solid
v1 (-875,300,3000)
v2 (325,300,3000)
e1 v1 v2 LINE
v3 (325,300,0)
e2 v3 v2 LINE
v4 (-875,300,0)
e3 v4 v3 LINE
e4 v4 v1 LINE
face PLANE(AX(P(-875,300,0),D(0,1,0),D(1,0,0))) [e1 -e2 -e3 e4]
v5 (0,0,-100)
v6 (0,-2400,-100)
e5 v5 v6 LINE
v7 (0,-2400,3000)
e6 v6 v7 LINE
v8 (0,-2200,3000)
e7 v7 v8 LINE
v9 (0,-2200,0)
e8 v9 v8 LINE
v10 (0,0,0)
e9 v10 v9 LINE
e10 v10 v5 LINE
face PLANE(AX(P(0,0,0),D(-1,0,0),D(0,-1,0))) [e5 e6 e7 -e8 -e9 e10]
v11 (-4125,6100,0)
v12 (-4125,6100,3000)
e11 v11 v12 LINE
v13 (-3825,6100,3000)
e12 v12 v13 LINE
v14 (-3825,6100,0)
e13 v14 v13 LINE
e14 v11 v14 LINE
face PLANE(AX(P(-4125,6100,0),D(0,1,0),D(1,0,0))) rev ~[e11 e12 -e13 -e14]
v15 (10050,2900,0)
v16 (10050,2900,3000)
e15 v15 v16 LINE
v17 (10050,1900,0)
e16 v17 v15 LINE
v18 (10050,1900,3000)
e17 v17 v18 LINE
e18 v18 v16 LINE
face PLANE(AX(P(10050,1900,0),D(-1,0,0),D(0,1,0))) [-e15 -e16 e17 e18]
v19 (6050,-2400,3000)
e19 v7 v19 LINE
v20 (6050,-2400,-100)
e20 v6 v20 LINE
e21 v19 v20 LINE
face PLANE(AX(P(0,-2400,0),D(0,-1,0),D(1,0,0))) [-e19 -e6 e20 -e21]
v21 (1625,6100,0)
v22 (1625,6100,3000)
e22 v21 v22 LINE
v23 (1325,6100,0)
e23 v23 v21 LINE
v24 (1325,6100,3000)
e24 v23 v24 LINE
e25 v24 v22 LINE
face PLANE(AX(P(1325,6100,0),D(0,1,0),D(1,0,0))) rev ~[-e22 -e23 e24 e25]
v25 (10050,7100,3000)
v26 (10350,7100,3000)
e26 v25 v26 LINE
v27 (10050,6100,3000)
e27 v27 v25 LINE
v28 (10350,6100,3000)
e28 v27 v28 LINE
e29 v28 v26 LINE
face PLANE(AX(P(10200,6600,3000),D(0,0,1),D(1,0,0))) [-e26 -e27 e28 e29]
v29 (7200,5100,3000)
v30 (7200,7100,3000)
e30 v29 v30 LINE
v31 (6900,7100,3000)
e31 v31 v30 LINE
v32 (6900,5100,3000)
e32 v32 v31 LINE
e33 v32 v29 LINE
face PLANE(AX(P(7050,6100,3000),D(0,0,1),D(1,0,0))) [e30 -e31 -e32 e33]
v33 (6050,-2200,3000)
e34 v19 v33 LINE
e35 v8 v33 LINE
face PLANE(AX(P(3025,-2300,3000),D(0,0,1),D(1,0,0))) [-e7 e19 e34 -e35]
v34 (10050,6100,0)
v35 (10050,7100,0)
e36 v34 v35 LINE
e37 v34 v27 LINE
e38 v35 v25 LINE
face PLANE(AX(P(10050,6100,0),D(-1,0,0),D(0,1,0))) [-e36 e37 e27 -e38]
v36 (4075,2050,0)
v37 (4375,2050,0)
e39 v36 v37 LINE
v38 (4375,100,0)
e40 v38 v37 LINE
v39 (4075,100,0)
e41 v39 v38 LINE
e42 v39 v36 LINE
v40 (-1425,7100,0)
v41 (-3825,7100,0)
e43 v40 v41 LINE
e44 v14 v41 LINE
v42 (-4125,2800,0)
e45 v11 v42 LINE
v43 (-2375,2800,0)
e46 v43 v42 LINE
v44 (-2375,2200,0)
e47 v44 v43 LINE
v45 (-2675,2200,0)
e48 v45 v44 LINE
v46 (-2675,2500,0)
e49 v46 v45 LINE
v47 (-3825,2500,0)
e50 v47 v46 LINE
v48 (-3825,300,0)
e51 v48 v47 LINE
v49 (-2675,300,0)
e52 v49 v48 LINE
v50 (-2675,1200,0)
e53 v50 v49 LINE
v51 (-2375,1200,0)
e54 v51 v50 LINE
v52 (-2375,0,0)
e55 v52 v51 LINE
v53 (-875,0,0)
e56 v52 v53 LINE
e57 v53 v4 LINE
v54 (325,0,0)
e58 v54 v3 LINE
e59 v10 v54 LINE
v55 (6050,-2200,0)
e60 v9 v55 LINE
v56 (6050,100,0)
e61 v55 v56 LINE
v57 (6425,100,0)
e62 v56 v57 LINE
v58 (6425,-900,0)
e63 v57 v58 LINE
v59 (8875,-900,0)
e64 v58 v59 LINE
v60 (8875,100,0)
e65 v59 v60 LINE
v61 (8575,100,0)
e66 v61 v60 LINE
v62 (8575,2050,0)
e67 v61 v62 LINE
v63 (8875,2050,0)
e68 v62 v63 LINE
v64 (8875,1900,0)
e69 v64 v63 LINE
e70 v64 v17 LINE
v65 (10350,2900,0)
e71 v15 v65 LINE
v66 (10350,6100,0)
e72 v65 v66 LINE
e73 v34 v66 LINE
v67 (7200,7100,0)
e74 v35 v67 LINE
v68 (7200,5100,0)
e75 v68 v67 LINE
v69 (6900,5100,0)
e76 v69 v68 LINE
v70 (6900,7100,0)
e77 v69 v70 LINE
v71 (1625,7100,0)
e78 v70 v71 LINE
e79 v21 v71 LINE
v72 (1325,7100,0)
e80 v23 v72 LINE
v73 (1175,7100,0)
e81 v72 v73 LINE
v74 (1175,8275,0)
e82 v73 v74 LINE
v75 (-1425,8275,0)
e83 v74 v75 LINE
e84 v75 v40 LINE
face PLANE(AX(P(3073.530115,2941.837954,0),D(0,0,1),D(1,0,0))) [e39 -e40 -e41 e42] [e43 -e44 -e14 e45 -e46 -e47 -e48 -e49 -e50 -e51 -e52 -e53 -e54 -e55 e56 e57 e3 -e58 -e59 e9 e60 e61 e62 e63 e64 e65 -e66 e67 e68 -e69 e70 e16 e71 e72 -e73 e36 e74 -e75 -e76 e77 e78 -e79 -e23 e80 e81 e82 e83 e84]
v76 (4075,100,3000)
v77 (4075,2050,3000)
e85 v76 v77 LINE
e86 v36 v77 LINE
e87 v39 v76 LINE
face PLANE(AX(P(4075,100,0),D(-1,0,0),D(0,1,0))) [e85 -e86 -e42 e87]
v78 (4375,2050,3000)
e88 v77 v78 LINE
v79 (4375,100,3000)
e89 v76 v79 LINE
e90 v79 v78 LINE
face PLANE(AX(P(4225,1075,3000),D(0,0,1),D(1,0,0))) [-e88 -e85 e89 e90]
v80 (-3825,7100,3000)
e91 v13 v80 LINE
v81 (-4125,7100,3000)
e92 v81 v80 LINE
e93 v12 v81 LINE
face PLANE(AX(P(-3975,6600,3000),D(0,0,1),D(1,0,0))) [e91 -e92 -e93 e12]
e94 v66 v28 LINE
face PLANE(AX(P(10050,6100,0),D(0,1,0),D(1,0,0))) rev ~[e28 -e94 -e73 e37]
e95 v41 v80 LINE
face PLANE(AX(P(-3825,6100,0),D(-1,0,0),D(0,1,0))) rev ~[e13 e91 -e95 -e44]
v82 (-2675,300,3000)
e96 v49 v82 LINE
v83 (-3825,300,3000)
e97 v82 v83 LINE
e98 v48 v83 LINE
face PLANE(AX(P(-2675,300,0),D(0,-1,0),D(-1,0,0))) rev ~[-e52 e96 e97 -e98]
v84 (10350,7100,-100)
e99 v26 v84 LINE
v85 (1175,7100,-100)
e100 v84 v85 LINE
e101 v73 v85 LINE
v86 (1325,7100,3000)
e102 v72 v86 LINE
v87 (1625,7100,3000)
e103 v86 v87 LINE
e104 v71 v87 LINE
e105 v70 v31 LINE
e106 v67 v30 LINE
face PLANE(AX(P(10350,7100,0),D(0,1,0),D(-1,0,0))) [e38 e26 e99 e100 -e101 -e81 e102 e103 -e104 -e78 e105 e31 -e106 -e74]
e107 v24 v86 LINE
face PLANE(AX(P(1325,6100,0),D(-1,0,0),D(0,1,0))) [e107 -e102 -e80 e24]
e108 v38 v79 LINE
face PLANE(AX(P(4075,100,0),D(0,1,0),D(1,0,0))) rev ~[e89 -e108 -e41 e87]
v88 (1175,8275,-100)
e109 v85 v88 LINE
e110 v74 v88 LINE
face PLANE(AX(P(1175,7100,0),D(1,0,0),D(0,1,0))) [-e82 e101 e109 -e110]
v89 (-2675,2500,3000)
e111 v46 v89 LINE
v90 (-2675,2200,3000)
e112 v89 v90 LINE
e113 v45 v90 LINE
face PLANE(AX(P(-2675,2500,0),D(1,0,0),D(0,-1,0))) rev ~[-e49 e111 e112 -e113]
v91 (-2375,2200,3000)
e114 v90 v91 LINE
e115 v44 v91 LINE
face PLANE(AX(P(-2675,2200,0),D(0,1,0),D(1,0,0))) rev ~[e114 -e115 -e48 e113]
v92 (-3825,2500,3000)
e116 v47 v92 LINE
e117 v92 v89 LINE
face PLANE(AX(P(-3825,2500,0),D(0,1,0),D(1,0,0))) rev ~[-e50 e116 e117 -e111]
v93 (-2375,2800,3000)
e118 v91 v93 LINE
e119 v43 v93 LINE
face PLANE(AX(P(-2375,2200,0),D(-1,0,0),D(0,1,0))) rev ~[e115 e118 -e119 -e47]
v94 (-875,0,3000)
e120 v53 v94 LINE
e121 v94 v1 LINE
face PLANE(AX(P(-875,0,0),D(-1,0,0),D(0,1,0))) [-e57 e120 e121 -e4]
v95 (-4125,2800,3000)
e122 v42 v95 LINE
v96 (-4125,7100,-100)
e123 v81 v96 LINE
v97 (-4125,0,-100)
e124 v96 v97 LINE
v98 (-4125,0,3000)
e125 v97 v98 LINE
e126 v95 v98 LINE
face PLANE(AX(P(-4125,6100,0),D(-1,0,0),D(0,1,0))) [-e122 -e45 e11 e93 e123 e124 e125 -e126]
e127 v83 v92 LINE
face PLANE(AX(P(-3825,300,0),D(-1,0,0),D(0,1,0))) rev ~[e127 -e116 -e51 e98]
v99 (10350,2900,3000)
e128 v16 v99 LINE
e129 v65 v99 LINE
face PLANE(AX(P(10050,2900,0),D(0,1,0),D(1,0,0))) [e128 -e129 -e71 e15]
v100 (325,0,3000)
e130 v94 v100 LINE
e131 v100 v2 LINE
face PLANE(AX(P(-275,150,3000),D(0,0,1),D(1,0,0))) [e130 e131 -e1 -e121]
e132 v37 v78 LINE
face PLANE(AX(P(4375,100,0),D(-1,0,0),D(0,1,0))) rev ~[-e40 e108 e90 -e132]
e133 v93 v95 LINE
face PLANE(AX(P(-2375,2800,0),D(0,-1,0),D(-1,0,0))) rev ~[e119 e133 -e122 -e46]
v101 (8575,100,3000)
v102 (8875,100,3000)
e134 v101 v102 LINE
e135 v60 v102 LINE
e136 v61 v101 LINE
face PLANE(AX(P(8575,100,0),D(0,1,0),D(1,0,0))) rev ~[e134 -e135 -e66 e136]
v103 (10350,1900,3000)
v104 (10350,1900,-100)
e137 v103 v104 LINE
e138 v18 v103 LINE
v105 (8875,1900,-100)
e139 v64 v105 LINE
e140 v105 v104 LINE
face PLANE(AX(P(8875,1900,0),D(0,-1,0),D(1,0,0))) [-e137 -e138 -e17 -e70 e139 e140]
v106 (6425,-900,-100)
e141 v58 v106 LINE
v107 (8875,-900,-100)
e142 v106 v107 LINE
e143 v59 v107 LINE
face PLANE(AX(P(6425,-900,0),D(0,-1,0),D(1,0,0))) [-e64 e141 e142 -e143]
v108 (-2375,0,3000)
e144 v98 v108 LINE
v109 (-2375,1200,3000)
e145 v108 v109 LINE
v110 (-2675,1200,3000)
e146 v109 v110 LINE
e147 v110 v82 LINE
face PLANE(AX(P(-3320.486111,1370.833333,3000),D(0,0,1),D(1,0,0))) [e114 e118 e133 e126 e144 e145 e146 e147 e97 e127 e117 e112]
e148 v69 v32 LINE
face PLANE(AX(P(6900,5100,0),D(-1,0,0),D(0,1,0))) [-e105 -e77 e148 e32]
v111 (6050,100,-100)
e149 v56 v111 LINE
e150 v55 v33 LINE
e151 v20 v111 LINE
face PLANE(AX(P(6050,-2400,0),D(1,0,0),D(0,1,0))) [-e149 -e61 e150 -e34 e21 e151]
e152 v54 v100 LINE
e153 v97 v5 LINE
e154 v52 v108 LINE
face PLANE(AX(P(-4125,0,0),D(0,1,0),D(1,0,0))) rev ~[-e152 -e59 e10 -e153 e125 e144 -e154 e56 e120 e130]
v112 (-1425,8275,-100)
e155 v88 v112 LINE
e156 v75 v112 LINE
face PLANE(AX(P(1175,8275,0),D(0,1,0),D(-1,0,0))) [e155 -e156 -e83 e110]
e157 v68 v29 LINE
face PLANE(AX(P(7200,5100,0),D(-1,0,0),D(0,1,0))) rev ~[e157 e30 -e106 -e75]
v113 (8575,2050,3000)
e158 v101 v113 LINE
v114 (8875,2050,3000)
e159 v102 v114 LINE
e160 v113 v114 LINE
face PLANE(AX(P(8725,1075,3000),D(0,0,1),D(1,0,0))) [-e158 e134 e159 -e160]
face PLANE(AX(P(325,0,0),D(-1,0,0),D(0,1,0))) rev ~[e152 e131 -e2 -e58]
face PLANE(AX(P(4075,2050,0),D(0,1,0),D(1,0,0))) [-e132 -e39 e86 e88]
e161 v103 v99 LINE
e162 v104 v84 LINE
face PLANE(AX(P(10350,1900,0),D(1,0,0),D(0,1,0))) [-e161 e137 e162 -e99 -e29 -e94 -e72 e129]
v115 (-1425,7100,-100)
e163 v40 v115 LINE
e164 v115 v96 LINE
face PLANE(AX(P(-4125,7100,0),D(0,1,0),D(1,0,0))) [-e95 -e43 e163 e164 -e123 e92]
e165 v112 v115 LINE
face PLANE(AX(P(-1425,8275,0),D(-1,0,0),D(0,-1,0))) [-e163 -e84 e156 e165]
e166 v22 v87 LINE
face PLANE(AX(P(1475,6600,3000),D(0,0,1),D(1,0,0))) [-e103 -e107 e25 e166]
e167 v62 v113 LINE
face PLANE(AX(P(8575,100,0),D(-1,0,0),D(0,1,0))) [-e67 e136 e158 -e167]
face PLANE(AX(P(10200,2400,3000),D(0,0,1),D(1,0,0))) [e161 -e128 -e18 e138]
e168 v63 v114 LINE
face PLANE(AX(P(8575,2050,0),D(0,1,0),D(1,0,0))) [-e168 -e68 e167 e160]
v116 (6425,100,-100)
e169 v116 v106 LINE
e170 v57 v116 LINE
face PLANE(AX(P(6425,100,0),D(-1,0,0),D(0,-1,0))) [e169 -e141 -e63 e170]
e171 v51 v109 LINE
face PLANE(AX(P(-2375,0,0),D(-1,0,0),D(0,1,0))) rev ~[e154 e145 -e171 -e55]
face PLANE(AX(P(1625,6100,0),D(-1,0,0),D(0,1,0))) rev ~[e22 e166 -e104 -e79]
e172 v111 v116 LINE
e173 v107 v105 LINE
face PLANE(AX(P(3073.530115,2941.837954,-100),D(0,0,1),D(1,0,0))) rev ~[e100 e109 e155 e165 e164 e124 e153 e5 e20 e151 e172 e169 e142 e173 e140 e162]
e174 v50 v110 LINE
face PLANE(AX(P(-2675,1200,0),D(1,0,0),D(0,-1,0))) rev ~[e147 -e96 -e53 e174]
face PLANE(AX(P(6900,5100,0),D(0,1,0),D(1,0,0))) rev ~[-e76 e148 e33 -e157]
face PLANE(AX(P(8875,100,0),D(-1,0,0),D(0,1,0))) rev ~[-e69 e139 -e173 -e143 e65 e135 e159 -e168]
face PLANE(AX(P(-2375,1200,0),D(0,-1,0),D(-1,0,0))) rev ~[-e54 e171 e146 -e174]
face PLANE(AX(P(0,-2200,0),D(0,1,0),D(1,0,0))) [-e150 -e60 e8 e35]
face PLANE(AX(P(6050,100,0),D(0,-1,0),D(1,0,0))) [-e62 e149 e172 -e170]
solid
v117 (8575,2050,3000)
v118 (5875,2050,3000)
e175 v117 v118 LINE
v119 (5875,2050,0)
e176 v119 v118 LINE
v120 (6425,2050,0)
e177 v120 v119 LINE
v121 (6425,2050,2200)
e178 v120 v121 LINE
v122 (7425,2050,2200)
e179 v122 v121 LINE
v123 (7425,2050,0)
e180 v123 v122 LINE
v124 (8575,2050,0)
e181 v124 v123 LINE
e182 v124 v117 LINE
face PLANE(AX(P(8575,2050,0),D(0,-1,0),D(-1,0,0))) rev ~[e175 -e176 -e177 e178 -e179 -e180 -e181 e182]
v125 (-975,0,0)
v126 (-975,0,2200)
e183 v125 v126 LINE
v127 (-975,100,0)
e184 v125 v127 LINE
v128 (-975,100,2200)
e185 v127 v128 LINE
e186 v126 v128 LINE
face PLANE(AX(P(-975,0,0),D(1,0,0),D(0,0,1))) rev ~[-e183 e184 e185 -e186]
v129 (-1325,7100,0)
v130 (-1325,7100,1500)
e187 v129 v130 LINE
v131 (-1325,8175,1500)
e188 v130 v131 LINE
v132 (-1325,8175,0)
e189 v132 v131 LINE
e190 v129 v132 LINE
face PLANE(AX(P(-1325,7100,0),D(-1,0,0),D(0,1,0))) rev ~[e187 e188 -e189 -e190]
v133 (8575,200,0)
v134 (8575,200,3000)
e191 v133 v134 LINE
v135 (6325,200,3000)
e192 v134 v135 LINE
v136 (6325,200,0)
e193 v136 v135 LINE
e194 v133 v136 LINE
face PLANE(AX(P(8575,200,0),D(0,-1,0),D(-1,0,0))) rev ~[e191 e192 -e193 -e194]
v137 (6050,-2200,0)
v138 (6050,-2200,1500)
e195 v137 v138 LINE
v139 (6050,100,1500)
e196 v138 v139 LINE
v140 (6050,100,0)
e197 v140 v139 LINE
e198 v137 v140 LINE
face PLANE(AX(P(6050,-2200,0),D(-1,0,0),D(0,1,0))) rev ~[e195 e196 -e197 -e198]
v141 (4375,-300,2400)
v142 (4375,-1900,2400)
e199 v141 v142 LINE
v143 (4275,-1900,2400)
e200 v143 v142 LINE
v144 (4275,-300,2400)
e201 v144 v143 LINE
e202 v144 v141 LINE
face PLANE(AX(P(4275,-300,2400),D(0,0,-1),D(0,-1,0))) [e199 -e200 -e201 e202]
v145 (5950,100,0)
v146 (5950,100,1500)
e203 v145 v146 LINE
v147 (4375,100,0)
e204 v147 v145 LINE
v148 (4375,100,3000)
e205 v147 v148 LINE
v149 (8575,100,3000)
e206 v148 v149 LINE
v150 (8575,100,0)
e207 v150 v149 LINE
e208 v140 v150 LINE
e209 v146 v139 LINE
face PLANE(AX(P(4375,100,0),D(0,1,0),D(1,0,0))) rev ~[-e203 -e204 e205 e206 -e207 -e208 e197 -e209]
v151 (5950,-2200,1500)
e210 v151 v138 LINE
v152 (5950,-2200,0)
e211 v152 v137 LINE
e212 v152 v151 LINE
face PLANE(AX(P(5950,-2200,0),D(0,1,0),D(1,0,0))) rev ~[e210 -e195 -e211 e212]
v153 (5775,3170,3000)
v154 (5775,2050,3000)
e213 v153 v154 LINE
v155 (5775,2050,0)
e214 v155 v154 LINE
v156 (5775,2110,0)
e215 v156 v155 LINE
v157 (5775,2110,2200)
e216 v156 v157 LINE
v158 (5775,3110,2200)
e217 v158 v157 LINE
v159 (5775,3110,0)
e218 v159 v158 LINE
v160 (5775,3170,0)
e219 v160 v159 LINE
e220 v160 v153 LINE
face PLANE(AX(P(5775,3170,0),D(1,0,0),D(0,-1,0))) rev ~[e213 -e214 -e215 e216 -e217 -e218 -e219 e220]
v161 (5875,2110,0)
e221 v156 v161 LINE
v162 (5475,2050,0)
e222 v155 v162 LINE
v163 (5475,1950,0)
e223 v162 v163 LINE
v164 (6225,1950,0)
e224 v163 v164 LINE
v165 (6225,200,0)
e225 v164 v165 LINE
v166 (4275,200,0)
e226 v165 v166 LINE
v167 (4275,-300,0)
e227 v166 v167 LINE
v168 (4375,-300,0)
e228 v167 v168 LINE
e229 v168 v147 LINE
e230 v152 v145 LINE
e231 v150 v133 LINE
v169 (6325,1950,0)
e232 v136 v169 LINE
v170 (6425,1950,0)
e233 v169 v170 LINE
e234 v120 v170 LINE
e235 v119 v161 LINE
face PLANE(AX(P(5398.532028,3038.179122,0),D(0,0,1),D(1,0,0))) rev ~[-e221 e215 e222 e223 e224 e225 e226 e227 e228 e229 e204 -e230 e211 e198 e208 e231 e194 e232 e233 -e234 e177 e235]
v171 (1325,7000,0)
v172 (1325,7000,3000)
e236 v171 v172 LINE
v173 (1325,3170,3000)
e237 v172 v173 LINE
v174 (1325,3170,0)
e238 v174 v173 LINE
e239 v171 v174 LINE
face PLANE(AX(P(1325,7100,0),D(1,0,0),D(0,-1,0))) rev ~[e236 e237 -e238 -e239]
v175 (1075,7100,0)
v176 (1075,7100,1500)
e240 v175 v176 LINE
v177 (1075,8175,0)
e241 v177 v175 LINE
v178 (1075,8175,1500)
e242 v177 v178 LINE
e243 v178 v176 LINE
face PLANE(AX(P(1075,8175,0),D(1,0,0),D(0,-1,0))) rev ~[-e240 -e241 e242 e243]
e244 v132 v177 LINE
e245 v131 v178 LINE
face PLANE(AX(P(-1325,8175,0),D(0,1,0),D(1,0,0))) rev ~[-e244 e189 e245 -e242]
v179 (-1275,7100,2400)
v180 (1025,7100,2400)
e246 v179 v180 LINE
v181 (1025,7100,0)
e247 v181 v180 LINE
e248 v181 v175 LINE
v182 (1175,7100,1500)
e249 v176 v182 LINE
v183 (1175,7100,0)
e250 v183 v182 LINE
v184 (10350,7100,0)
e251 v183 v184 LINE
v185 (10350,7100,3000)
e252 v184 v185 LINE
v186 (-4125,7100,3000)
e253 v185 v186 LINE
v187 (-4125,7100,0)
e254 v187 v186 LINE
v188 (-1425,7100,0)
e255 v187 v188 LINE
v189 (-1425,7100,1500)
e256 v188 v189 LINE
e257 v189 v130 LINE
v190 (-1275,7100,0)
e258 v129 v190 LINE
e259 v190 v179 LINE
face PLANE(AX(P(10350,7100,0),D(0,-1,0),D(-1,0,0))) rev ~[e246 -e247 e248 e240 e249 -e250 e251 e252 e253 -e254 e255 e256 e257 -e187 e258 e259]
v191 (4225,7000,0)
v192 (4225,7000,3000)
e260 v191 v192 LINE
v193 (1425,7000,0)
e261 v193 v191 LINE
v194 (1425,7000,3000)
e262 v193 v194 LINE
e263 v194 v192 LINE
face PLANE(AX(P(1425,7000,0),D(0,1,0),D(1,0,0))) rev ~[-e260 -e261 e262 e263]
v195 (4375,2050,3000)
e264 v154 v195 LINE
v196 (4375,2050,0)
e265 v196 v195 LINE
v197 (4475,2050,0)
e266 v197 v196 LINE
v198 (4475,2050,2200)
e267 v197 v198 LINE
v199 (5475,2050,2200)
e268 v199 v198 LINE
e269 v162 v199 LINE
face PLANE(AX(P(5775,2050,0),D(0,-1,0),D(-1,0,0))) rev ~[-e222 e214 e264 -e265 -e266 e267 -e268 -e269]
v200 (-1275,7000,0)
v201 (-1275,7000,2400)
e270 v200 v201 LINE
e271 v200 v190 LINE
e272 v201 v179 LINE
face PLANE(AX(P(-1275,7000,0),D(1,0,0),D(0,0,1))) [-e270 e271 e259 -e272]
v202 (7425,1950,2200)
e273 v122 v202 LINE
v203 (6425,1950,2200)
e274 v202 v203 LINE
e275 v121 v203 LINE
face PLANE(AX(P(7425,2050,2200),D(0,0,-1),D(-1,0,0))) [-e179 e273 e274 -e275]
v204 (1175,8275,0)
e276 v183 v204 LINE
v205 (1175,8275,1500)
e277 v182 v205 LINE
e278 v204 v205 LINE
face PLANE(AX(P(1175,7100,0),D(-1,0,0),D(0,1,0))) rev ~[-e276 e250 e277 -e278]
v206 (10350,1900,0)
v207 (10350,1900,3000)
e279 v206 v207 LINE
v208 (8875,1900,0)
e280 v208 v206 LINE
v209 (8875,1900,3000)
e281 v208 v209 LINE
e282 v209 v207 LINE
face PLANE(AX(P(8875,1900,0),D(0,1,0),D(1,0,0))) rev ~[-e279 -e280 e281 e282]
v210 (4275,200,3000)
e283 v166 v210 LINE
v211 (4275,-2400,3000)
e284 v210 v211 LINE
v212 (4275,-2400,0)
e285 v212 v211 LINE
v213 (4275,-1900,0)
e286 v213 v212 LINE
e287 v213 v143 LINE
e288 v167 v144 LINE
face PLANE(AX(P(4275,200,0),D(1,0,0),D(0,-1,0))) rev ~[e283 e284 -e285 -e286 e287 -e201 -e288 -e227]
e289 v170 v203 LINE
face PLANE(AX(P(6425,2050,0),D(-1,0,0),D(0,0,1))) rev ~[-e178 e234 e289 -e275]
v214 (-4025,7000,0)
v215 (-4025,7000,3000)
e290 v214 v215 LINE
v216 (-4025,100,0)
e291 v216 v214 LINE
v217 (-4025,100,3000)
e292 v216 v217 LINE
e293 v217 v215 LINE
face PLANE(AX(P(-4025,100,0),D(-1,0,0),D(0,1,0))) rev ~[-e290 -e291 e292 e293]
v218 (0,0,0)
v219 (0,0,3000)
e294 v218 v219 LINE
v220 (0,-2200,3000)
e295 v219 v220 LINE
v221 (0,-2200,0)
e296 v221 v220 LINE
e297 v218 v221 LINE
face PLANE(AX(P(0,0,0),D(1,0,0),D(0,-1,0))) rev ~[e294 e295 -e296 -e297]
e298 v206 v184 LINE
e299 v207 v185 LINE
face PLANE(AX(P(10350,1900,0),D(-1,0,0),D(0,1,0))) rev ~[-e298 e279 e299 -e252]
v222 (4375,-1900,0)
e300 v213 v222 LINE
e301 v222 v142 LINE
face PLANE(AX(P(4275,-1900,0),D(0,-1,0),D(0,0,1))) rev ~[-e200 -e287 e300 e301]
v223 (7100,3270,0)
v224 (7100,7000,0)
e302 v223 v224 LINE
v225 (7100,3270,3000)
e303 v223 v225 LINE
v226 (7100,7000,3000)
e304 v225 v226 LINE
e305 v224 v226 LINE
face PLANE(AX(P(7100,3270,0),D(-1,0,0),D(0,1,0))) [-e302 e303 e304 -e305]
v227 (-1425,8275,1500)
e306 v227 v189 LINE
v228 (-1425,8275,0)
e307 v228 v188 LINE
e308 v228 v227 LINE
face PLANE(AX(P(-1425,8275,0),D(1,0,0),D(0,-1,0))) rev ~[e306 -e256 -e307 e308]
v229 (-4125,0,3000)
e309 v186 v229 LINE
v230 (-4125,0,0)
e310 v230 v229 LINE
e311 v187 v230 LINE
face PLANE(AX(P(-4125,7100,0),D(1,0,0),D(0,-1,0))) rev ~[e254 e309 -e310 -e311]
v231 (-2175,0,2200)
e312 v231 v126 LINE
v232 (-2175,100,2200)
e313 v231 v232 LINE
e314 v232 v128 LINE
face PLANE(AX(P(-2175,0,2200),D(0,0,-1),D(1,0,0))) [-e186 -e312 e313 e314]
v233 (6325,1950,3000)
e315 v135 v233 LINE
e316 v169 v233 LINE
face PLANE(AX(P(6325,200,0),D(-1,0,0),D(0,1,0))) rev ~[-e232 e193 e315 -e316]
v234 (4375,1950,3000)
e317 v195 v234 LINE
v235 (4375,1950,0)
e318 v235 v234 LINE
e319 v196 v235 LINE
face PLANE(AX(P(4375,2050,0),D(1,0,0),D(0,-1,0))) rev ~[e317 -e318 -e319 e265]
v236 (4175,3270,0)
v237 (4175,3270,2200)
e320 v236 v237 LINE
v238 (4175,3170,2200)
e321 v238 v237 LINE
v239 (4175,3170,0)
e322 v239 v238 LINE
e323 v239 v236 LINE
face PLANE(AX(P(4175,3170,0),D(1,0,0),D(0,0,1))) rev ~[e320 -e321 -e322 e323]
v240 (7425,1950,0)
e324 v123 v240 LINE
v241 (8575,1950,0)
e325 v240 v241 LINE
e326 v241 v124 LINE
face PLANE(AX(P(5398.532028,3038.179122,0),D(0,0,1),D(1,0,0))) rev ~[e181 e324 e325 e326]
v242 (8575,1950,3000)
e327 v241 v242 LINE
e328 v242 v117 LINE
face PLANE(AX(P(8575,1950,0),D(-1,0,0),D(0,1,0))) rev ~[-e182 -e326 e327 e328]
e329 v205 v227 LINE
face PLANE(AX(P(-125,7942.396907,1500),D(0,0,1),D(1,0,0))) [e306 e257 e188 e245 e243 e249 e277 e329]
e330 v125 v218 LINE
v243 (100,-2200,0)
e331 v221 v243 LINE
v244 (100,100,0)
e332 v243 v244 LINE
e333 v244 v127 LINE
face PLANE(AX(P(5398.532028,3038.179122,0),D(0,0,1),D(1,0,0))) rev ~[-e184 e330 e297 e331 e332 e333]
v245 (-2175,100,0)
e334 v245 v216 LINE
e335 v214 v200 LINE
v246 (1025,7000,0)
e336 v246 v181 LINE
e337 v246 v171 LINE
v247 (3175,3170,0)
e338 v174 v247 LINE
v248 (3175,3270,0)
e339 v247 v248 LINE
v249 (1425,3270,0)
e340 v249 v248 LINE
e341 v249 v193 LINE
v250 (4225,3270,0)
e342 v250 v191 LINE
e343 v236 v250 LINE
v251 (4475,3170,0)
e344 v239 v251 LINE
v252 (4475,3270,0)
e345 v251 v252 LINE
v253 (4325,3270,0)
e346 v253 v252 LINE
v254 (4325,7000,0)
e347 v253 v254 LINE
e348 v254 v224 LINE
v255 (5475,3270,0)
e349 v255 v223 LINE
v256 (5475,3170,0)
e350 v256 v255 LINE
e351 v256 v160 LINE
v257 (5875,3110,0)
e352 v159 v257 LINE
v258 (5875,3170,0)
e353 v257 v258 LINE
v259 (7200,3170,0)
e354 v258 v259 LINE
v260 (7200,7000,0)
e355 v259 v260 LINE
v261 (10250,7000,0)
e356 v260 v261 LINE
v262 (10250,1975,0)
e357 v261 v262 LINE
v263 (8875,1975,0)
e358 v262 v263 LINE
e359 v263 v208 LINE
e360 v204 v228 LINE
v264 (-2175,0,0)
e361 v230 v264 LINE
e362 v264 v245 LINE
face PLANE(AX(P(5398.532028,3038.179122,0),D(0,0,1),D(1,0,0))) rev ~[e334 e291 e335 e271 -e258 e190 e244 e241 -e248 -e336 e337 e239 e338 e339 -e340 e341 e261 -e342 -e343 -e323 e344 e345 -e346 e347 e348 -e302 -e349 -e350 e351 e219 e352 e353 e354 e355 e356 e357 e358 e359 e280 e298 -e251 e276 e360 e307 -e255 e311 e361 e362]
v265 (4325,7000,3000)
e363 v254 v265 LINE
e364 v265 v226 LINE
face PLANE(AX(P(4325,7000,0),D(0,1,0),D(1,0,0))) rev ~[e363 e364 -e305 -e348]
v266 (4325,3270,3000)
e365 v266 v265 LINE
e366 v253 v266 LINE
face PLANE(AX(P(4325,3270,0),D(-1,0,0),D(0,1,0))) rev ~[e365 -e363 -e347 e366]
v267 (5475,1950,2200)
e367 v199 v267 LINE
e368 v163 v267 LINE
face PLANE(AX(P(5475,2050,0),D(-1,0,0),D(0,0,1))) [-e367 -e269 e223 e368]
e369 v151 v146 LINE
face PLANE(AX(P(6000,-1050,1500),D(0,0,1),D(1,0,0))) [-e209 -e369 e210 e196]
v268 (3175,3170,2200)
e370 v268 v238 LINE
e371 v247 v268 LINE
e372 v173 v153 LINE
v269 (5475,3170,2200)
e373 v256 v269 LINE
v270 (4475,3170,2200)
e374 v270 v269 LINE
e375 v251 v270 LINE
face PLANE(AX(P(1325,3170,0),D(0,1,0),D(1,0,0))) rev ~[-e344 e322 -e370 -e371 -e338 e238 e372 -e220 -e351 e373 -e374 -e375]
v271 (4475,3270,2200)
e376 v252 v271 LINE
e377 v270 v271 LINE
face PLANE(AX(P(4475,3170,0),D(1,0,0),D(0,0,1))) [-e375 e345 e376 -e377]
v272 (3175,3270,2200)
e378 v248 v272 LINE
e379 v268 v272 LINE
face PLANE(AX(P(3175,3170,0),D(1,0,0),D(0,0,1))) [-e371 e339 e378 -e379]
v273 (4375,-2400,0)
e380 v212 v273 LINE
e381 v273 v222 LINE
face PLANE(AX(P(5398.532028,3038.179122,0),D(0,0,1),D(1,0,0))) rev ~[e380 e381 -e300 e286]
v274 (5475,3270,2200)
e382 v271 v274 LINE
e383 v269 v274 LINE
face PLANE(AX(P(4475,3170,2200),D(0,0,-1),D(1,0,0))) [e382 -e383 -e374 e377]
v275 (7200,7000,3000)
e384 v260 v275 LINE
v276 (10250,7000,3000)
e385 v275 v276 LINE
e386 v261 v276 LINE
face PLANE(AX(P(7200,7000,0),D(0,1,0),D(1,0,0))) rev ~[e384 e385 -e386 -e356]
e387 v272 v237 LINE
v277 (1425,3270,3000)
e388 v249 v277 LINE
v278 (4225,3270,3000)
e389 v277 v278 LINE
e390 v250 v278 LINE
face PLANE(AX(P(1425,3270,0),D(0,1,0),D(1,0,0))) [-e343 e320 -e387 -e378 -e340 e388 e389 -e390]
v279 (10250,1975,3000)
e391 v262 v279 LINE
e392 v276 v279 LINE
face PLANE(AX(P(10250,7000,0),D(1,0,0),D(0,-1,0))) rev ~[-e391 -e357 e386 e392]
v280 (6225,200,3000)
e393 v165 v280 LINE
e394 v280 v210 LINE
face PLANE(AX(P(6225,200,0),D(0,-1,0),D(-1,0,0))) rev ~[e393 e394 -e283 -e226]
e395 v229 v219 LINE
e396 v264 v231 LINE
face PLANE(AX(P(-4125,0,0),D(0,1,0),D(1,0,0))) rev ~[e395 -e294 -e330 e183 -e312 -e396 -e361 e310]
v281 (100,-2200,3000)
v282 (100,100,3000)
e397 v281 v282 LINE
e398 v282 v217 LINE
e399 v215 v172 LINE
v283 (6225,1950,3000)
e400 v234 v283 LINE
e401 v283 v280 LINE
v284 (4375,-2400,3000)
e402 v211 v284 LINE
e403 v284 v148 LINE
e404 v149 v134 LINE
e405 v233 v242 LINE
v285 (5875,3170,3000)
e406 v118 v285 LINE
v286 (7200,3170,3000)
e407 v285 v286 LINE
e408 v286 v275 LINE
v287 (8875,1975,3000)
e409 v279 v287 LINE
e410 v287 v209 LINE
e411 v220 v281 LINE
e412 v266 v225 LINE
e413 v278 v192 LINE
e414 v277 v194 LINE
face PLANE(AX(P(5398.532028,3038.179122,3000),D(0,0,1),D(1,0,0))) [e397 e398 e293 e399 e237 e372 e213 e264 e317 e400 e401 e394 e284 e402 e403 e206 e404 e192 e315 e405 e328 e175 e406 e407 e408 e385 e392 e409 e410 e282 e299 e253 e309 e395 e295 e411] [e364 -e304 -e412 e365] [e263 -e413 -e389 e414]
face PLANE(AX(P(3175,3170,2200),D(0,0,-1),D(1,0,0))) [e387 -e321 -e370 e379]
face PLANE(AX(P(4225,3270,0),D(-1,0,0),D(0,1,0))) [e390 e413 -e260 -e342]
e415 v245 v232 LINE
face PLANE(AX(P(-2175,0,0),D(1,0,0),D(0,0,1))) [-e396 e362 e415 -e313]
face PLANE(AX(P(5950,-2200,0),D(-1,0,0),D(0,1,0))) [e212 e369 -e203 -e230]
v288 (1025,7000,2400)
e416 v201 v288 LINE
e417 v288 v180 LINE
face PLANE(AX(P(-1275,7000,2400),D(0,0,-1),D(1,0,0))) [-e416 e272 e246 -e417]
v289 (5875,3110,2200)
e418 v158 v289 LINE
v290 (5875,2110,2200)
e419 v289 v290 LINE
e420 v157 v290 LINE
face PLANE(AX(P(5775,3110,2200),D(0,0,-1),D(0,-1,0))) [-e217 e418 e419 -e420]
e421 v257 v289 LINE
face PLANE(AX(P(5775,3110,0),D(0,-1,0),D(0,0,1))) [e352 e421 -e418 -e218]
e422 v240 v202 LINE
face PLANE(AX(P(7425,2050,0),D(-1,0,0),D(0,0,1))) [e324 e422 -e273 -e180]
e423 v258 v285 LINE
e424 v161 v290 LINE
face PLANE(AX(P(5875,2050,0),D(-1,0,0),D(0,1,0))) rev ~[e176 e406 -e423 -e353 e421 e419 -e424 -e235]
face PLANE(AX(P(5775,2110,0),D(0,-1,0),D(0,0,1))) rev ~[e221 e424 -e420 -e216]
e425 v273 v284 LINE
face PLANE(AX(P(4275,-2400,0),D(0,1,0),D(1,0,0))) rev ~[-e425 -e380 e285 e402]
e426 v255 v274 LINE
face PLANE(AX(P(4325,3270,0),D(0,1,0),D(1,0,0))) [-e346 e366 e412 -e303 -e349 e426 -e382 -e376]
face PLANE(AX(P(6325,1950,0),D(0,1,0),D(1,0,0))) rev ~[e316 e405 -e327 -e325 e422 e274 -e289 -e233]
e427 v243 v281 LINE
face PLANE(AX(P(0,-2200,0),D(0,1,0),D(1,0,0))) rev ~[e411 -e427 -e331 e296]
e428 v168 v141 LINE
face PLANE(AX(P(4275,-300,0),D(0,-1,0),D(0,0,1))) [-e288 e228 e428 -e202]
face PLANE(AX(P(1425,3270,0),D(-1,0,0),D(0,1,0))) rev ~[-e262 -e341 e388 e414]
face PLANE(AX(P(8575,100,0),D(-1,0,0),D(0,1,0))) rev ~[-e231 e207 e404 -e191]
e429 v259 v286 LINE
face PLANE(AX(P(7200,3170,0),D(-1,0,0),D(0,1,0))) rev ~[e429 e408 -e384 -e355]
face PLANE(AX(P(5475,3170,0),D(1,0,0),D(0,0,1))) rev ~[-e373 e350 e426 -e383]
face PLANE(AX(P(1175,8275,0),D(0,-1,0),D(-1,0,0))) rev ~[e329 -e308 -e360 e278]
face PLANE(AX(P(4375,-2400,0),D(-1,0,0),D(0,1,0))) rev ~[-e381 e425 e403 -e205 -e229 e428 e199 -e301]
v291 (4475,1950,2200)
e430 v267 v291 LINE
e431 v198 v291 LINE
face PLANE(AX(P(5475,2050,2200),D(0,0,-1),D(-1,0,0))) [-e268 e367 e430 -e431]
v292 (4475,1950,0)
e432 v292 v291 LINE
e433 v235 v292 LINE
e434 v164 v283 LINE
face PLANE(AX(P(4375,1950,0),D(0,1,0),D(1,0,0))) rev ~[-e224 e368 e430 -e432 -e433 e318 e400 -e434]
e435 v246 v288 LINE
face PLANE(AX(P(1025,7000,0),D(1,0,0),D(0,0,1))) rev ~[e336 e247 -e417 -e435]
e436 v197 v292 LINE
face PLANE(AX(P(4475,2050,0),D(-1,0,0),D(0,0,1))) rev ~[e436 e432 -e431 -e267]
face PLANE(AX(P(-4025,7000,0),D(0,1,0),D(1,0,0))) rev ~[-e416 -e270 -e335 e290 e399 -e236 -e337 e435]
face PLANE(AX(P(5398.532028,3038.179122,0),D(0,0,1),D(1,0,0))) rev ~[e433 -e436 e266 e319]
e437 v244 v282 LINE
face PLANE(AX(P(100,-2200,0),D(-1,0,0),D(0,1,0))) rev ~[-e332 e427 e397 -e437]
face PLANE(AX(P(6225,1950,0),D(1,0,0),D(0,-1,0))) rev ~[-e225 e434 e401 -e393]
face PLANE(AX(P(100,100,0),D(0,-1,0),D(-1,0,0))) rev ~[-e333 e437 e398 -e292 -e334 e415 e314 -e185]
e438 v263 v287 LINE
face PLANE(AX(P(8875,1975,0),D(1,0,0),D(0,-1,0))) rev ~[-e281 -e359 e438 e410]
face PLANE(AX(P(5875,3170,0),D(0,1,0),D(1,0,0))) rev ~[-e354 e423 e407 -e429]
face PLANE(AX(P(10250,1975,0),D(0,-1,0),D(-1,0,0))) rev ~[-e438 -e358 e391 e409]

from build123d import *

# Parameters (mm, degrees)
F1_DEPTH  = 100
F3_DEPTH  = 3000
F4_W      = 300
F4_H      = 1000
F4_H_2    = 2000
F4_H_3    = 1950
F4_W_2    = 1200
F4_H_4    = 300
F4_W_3    = 6050
F4_H_5    = 200
F5_DEPTH  = 3000
F6_W      = 2750
F6_H      = 100
F7_DEPTH  = 3000
F8_W      = 2800
F8_H      = 3730
F8_W_2    = 2775
F9_DEPTH  = 3000
F10_W     = 1200
F10_H     = 2200
F11_DEPTH = 100
F12_W     = 1000
F12_H     = 2200
F13_DEPTH = 100
F14_W     = 1000
F14_H     = 2200
F15_DEPTH = 100
F16_W     = 1000
F16_H     = 2200
F17_DEPTH = 100
F18_W     = 1600
F18_H     = 2400
F19_DEPTH = 100
F20_W     = 2300
F20_H     = 2400
F21_DEPTH = 100
F22_W     = 100
F22_H     = 2300
F23_DEPTH = 1500


with BuildPart() as f1:
    # F0 (on Top) → F1 (new body)
    with BuildSketch(Plane.XY):
        Polygon((-4125, 0), (0, 0), (0, -2400), (6050, -2400), (6050, -900), (6050, 0), (6050, 100), (6425, 100), (6425, 0), (6425, -900), (8875, -900), (8875, 1900), (10350, 1900), (10350, 7100), (1175, 7100), (1175, 8275), (-1425, 8275), (-1425, 7100), (-4125, 7100), align=None)
    extrude(amount=-F1_DEPTH)

    # F2 (on face) → F3 (join)
    with BuildSketch(Plane.XY):
        Polygon((-4125, 2800), (-4125, 0), (-2375, 0), (-2375, 1200), (-2675, 1200), (-2675, 300), (-3825, 300), (-3825, 2500), (-2675, 2500), (-2675, 2200), (-2375, 2200), (-2375, 2800), align=None)
    extrude(amount=F3_DEPTH)

    # F4 (on face) → F5 (join)
    with BuildSketch(Plane.XY):
        with Locations((-3975, 6600)):
            Rectangle(F4_W, F4_H)
        with Locations((1475, 6600)):
            Rectangle(F4_W, F4_H)
        with Locations((7050, 6100)):
            Rectangle(F4_W, F4_H_2)
        with Locations((10200, 6600)):
            Rectangle(F4_W, F4_H)
        with Locations((10200, 2400)):
            Rectangle(F4_W, F4_H)
        with Locations((8725, 1075)):
            Rectangle(F4_W, F4_H_3)
        with Locations((4225, 1075)):
            Rectangle(F4_W, F4_H_3)
        with Locations((-275, 150)):
            Rectangle(F4_W_2, F4_H_4)
        with Locations((3025, -2300)):
            Rectangle(F4_W_3, F4_H_5)
    extrude(amount=F5_DEPTH)


with BuildPart() as f7:
    # F6 (on face) → F7 (new body)
    with BuildSketch(Plane.XY):
        Polygon((0, 0), (0, -2200), (100, -2200), (100, 100), (-4025, 100), (-4025, 7000), (-1425, 7000), (-1425, 7100), (-4125, 7100), (-4125, 0), align=None)
        with Locations((-50, 7050)):
            Rectangle(F6_W, F6_H)
    extrude(amount=F7_DEPTH)

    # F8 (on face) → F9 (join)
    with BuildSketch(Plane.XY):
        Polygon((5875, 3170), (7200, 3170), (7200, 7000), (7200, 7100), (1325, 7100), (1325, 3170), (5775, 3170), (5775, 2050), (4375, 2050), (4375, 1950), (6225, 1950), (6225, 200), (4375, 200), (4375, 100), (8575, 100), (8575, 200), (6325, 200), (6325, 1950), (8575, 1950), (8575, 2050), (5875, 2050), align=None)
        with Locations((2825, 5135)):
            Rectangle(F8_W, F8_H, mode=Mode.SUBTRACT)
        with Locations((5712.5, 5135)):
            Rectangle(F8_W_2, F8_H, mode=Mode.SUBTRACT)
        Polygon((7200, 7100), (7200, 7000), (10250, 7000), (10250, 1975), (8875, 1975), (8875, 1900), (10250, 1900), (10350, 1900), (10350, 7000), (10350, 7100), (10250, 7100), align=None)
        Polygon((4375, -2400), (4375, 100), (4375, 200), (4275, 200), (4275, -2400), align=None)
    extrude(amount=F9_DEPTH)

    # F10 (on face) → F11 (cut)
    with BuildSketch(Plane.XZ):
        with Locations((-1575, 1100)):
            Rectangle(F10_W, F10_H)
    extrude(amount=-F11_DEPTH, mode=Mode.SUBTRACT)

    # F12 (on face) → F13 (cut)
    with BuildSketch(Plane.XZ.offset(-3170)):
        with Locations((3675, 1100)):
            Rectangle(F12_W, F12_H)
        with Locations((4975, 1100)):
            Rectangle(F12_W, F12_H)
    extrude(amount=-F13_DEPTH, mode=Mode.SUBTRACT)

    # F14 (on face) → F15 (cut)
    with BuildSketch(Plane(origin=(5775, 0, 0), x_dir=(0, -1, 0), z_dir=(-1, 0, 0))):
        with Locations((-2610, 1100)):
            Rectangle(F14_W, F14_H)
    extrude(amount=-F15_DEPTH, mode=Mode.SUBTRACT)

    # F16 (on face) → F17 (cut)
    with BuildSketch(Plane(origin=(0, 2050, 0), x_dir=(-1, 0, 0), z_dir=(0, 1, 0))):
        with Locations((-4975, 1100)):
            Rectangle(F16_W, F16_H)
        with Locations((-6925, 1100)):
            Rectangle(F16_W, F16_H)
    extrude(amount=-F17_DEPTH, mode=Mode.SUBTRACT)

    # F18 (on face) → F19 (cut)
    with BuildSketch(Plane(origin=(4275, 0, 0), x_dir=(0, -1, 0), z_dir=(-1, 0, 0))):
        with Locations((1100, 1200)):
            Rectangle(F18_W, F18_H)
    extrude(amount=-F19_DEPTH, mode=Mode.SUBTRACT)

    # F20 (on face) → F21 (cut)
    with BuildSketch(Plane.XZ.offset(-7000)):
        with Locations((-125, 1200)):
            Rectangle(F20_W, F20_H)
    extrude(amount=-F21_DEPTH, mode=Mode.SUBTRACT)

    # F22 (on face) → F23 (join)
    with BuildSketch(Plane.XY):
        Polygon((-1425, 8275), (-1425, 7100), (-1325, 7100), (-1325, 8175), (1075, 8175), (1075, 7100), (1175, 7100), (1175, 8275), align=None)
        with Locations((6000, -1050)):
            Rectangle(F22_W, F22_H)
    extrude(amount=F23_DEPTH)


solid = Compound([f1.part, f7.part])
